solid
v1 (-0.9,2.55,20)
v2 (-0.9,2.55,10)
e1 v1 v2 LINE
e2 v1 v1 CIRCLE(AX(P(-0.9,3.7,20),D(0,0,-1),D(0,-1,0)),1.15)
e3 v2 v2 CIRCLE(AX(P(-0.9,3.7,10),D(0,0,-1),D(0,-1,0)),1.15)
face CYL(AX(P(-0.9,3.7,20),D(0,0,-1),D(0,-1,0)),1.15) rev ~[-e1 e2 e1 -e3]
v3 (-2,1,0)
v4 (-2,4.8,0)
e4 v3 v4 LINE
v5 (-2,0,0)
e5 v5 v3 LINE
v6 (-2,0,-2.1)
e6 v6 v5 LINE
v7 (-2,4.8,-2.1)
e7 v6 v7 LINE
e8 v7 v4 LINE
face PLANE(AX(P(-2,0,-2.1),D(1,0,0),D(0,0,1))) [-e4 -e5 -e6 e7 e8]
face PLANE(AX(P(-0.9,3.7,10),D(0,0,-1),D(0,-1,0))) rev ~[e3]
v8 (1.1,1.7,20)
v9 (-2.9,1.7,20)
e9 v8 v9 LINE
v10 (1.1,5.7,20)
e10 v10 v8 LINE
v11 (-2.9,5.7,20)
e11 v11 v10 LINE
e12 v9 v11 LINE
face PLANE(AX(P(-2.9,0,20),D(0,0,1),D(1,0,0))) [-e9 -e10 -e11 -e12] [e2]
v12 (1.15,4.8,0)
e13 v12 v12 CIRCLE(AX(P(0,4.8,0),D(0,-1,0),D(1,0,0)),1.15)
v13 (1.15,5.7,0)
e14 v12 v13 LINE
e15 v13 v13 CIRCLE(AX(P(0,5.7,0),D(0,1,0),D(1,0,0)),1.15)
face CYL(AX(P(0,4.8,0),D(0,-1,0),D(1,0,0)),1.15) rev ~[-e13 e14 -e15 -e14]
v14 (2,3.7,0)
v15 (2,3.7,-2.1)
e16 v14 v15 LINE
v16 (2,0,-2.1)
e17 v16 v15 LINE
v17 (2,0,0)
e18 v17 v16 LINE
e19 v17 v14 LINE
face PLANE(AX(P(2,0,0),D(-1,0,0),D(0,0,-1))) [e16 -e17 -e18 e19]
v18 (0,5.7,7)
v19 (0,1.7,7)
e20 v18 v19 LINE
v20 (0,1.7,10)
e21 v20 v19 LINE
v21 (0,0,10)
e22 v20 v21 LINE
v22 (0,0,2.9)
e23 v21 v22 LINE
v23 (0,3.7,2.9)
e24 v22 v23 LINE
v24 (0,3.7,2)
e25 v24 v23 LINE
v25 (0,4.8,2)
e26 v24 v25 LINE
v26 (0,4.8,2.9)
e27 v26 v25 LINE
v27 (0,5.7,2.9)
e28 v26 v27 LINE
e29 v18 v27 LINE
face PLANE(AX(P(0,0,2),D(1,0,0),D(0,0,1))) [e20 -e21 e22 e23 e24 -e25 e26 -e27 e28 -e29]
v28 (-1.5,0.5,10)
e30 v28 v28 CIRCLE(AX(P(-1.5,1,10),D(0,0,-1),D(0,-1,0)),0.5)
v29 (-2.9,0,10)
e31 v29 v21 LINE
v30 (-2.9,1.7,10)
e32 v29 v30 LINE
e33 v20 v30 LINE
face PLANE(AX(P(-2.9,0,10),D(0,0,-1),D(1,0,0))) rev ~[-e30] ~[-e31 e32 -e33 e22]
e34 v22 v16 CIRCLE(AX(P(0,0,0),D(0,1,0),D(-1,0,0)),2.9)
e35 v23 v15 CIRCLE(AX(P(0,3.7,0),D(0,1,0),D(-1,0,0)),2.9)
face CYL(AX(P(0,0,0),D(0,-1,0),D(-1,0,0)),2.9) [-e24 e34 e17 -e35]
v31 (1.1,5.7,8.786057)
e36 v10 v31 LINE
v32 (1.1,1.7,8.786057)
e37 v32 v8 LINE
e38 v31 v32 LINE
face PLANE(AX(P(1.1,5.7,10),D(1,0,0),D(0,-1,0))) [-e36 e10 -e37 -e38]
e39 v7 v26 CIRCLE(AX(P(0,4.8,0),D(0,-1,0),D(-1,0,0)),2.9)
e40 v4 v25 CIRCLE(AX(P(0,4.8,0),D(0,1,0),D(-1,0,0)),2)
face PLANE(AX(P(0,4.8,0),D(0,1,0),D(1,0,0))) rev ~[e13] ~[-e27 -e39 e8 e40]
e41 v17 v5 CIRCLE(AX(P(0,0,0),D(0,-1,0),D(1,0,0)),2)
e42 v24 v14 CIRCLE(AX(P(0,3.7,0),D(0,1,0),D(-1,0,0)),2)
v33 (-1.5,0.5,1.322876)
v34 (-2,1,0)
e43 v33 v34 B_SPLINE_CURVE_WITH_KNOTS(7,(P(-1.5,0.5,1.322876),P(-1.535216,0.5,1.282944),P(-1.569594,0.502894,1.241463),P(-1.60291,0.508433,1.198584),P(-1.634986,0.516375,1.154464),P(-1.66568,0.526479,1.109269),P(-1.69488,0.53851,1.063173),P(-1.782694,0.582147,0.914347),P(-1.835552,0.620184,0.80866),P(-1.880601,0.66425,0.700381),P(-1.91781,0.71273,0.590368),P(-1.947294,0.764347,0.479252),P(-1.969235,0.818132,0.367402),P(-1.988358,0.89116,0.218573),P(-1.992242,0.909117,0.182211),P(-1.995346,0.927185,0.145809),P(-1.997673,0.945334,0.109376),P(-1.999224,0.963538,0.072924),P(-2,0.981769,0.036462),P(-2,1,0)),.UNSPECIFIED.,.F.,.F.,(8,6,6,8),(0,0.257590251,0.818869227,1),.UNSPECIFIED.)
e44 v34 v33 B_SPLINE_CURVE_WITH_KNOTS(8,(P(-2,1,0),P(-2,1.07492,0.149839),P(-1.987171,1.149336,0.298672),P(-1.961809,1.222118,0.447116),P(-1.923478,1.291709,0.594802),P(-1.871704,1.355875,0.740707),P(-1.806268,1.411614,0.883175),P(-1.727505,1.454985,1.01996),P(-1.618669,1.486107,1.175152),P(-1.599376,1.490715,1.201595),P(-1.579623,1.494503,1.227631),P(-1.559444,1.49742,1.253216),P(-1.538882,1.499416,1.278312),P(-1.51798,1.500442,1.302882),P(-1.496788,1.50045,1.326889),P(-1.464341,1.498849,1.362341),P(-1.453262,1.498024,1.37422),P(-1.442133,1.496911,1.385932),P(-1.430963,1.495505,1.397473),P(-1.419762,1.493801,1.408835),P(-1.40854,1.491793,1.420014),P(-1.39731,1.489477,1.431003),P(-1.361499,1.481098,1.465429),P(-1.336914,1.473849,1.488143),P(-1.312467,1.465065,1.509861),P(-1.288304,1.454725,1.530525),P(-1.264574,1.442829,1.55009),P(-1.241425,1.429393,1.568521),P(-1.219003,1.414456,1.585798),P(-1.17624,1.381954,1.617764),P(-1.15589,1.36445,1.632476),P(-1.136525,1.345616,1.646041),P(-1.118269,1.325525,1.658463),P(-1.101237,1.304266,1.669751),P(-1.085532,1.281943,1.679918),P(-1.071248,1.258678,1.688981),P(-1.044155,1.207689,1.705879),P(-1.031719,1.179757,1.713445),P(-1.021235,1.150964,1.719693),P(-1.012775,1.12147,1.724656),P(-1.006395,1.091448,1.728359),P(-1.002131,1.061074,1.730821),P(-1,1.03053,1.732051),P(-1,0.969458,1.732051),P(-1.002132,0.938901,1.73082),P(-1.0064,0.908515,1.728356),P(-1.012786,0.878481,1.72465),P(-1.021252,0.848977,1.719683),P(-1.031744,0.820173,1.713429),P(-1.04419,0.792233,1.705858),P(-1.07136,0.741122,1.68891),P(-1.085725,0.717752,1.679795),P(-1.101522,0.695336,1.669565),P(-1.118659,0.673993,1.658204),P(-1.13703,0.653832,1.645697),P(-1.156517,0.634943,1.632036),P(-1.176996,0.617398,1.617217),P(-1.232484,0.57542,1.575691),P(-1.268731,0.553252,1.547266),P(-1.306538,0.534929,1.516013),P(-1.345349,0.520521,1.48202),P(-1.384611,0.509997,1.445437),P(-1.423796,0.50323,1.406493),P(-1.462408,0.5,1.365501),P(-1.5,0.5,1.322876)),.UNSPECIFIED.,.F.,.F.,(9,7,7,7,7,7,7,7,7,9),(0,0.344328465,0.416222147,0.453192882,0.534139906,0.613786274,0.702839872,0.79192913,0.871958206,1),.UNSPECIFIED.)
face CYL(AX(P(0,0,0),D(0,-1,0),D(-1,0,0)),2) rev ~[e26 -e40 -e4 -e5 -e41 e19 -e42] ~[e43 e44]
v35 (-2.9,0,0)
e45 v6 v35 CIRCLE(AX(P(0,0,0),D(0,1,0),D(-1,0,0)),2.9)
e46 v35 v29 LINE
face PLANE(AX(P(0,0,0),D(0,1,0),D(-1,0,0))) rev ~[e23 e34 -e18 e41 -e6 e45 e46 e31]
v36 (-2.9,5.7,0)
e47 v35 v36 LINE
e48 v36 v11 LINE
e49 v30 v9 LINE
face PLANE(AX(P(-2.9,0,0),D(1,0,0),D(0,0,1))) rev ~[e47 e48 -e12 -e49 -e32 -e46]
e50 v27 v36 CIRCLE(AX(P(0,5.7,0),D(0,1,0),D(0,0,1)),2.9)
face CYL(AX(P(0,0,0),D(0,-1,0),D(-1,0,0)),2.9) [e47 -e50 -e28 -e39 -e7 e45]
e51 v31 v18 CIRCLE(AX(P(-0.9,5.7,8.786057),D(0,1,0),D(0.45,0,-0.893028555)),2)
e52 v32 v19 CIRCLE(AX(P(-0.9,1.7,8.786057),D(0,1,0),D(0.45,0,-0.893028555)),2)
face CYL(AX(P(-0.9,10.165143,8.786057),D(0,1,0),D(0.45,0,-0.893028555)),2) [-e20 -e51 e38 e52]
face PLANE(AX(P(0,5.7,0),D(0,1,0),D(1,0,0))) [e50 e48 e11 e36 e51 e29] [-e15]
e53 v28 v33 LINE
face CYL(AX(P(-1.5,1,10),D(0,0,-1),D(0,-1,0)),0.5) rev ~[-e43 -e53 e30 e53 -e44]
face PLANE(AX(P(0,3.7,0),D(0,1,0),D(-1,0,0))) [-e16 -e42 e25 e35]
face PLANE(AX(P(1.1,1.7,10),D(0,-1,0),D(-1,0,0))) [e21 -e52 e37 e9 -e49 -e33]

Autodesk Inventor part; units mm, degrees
ref_plane "YZ Plane" through (0, 0, 0) normal (1, 0, 0) x (0, 1, 0)
ref_plane "XZ Plane" through (0, 0, 0) normal (0, 1, 0) x (-1, 0, 0)
ref_plane "XY Plane" through (0, 0, 0) normal (0, 0, 1) x (1, 0, 0)
sketch "スケッチ1" plane through (0, 0, 0) normal (0, 1, 0) x (-1, 0, 0)
  circle A0 centre (0, 0) radius 1.15
  circle A1 centre (0, 0) radius 2
  circle A2 centre (0, 0) radius 2.9
  line L0 (2, 0) -> (-2, 0)
  line L1 (-2, 0) -> (-2, -2.9)
  line L2 (-2, -2.9) -> (2, -2.9)
  line L3 (2, -2.9) -> (2, 0)
  line L4 (0, 0) -> (0, 2.9)
  line L5 (0, 0) -> (2.9, 0)
  line L6 (2.9, 0) -> (2.9, 10)
  line L7 (2.9, 10) -> (0, 10)
  line L8 (0, 10) -> (0, 0)
  point P0 (0, 2)
  point P1 (-2, -2.1)
  point P2 (2, -2.1)
  dimension "d1" = 4
  dimension "d2" = 5.8
  dimension "d0" = 2.3
  dimension "d3" = 10
extrude "押し出し1" add sketch "スケッチ1" along normal blind 3.7 contours A1 L1 A2 L4
extrude "押し出し2" add sketch "スケッチ1" along normal blind 4.8 contours L5 A2 L3 | A1 L4 A2 L5 | A2 L8 L7 L6
sketch "スケッチ2" plane through (0, 4.8, 0) normal (0, 1, 0) x (1, 0, 0)
  circle A0 centre (0, 0) radius 1.15
  circle A1 centre (0, 0) radius 2.0044
  circle A2 centre (0, 0) radius 2.9
  line L0 (2, 2.1) -> (2, 0) projected
  line L1 (2, 0) -> (-2.0044, 0)
  line L2 (-2.0044, 0) -> (-2.0044, 2.9)
  line L3 (-2.0044, 2.9) -> (2, 2.9)
  line L4 (2, 2.9) -> (2, 0)
  line L5 (0, -10) -> (0, -2) projected
  line L6 (-2.9, 0) -> (0, 0)
  line L7 (0, 0) -> (0, -10)
  line L8 (0, -10) -> (-2.9, -10)
  line L9 (-2.9, -10) -> (-2.9, 0)
  point P0 (0, -2.9)
  dimension "d8" = 2.3
extrude "押し出し3" add sketch "スケッチ2" along normal blind 0.9 contours L1 L0 A1 L5 L7 A0 | A0 L1 A1 L0 | A0 L7 L5 A1 L1 | L2 A2 L0 A1 | L6 A2 L2 | A1 L5 A2 L6 | L0 A2 L5 A1 | A2 L5 L8 L9
sketch "スケッチ3" plane through (-2.9, 0, 10) normal (0, 0, 1) x (1, 0, 0)
  line L0 (2.9, 0) -> (1.4, 0)
  line L1 (1.4, 0) -> (1.4, 1)
  line L2 (1.4, 1) -> (2.9, 1)
  line L3 (2.9, 1) -> (2.9, 0)
  dimension "d11" = 1.5
  dimension "d12" = 1
hole "穴1" at (-1.5, 1, 10) direction (0, 0, -1) diameter 1 depth 10
sketch "スケッチ4" plane through (-2.9, 0, 10) normal (0, 0, 1) x (1, 0, 0)
  line L0 (0, 0) -> (0, 5.7) projected
  line L1 (0, 5.7) -> (4, 5.7)
  line L2 (4, 5.7) -> (4, 1.7)
  line L3 (4, 1.7) -> (0, 1.7)
  line L4 (0, 1.7) -> (0, 5.7)
  point P0 (2.9, 0)
  dimension "d20" = 4
  dimension "d21" = 4
extrude "押し出し4" add sketch "スケッチ4" along normal blind 10 and the other way blind 3
fillet "フィレット1" radius 2 1 edges at (1.1, 3.7, 7)
sketch "スケッチ5" plane through (-2.9, 0, 20) normal (0, 0, 1) x (1, 0, 0)
  line L0 (5.8, 5.7) -> (0, 5.7) projected
  line L1 (0, 5.7) -> (2, 5.7)
  line L2 (2, 5.7) -> (2, 3.7)
  line L3 (2, 3.7) -> (0, 3.7)
  line L4 (0, 3.7) -> (0, 5.7)
  point P0 (2.9, 0)
  point P1 (2.9, 5.7)
  dimension "d27" = 2
  dimension "d28" = 2
hole "穴2" at (-0.9, 3.7, 20) direction (0, 0, -1) diameter 2.3 depth 10
properties part number "srod1.4left"
